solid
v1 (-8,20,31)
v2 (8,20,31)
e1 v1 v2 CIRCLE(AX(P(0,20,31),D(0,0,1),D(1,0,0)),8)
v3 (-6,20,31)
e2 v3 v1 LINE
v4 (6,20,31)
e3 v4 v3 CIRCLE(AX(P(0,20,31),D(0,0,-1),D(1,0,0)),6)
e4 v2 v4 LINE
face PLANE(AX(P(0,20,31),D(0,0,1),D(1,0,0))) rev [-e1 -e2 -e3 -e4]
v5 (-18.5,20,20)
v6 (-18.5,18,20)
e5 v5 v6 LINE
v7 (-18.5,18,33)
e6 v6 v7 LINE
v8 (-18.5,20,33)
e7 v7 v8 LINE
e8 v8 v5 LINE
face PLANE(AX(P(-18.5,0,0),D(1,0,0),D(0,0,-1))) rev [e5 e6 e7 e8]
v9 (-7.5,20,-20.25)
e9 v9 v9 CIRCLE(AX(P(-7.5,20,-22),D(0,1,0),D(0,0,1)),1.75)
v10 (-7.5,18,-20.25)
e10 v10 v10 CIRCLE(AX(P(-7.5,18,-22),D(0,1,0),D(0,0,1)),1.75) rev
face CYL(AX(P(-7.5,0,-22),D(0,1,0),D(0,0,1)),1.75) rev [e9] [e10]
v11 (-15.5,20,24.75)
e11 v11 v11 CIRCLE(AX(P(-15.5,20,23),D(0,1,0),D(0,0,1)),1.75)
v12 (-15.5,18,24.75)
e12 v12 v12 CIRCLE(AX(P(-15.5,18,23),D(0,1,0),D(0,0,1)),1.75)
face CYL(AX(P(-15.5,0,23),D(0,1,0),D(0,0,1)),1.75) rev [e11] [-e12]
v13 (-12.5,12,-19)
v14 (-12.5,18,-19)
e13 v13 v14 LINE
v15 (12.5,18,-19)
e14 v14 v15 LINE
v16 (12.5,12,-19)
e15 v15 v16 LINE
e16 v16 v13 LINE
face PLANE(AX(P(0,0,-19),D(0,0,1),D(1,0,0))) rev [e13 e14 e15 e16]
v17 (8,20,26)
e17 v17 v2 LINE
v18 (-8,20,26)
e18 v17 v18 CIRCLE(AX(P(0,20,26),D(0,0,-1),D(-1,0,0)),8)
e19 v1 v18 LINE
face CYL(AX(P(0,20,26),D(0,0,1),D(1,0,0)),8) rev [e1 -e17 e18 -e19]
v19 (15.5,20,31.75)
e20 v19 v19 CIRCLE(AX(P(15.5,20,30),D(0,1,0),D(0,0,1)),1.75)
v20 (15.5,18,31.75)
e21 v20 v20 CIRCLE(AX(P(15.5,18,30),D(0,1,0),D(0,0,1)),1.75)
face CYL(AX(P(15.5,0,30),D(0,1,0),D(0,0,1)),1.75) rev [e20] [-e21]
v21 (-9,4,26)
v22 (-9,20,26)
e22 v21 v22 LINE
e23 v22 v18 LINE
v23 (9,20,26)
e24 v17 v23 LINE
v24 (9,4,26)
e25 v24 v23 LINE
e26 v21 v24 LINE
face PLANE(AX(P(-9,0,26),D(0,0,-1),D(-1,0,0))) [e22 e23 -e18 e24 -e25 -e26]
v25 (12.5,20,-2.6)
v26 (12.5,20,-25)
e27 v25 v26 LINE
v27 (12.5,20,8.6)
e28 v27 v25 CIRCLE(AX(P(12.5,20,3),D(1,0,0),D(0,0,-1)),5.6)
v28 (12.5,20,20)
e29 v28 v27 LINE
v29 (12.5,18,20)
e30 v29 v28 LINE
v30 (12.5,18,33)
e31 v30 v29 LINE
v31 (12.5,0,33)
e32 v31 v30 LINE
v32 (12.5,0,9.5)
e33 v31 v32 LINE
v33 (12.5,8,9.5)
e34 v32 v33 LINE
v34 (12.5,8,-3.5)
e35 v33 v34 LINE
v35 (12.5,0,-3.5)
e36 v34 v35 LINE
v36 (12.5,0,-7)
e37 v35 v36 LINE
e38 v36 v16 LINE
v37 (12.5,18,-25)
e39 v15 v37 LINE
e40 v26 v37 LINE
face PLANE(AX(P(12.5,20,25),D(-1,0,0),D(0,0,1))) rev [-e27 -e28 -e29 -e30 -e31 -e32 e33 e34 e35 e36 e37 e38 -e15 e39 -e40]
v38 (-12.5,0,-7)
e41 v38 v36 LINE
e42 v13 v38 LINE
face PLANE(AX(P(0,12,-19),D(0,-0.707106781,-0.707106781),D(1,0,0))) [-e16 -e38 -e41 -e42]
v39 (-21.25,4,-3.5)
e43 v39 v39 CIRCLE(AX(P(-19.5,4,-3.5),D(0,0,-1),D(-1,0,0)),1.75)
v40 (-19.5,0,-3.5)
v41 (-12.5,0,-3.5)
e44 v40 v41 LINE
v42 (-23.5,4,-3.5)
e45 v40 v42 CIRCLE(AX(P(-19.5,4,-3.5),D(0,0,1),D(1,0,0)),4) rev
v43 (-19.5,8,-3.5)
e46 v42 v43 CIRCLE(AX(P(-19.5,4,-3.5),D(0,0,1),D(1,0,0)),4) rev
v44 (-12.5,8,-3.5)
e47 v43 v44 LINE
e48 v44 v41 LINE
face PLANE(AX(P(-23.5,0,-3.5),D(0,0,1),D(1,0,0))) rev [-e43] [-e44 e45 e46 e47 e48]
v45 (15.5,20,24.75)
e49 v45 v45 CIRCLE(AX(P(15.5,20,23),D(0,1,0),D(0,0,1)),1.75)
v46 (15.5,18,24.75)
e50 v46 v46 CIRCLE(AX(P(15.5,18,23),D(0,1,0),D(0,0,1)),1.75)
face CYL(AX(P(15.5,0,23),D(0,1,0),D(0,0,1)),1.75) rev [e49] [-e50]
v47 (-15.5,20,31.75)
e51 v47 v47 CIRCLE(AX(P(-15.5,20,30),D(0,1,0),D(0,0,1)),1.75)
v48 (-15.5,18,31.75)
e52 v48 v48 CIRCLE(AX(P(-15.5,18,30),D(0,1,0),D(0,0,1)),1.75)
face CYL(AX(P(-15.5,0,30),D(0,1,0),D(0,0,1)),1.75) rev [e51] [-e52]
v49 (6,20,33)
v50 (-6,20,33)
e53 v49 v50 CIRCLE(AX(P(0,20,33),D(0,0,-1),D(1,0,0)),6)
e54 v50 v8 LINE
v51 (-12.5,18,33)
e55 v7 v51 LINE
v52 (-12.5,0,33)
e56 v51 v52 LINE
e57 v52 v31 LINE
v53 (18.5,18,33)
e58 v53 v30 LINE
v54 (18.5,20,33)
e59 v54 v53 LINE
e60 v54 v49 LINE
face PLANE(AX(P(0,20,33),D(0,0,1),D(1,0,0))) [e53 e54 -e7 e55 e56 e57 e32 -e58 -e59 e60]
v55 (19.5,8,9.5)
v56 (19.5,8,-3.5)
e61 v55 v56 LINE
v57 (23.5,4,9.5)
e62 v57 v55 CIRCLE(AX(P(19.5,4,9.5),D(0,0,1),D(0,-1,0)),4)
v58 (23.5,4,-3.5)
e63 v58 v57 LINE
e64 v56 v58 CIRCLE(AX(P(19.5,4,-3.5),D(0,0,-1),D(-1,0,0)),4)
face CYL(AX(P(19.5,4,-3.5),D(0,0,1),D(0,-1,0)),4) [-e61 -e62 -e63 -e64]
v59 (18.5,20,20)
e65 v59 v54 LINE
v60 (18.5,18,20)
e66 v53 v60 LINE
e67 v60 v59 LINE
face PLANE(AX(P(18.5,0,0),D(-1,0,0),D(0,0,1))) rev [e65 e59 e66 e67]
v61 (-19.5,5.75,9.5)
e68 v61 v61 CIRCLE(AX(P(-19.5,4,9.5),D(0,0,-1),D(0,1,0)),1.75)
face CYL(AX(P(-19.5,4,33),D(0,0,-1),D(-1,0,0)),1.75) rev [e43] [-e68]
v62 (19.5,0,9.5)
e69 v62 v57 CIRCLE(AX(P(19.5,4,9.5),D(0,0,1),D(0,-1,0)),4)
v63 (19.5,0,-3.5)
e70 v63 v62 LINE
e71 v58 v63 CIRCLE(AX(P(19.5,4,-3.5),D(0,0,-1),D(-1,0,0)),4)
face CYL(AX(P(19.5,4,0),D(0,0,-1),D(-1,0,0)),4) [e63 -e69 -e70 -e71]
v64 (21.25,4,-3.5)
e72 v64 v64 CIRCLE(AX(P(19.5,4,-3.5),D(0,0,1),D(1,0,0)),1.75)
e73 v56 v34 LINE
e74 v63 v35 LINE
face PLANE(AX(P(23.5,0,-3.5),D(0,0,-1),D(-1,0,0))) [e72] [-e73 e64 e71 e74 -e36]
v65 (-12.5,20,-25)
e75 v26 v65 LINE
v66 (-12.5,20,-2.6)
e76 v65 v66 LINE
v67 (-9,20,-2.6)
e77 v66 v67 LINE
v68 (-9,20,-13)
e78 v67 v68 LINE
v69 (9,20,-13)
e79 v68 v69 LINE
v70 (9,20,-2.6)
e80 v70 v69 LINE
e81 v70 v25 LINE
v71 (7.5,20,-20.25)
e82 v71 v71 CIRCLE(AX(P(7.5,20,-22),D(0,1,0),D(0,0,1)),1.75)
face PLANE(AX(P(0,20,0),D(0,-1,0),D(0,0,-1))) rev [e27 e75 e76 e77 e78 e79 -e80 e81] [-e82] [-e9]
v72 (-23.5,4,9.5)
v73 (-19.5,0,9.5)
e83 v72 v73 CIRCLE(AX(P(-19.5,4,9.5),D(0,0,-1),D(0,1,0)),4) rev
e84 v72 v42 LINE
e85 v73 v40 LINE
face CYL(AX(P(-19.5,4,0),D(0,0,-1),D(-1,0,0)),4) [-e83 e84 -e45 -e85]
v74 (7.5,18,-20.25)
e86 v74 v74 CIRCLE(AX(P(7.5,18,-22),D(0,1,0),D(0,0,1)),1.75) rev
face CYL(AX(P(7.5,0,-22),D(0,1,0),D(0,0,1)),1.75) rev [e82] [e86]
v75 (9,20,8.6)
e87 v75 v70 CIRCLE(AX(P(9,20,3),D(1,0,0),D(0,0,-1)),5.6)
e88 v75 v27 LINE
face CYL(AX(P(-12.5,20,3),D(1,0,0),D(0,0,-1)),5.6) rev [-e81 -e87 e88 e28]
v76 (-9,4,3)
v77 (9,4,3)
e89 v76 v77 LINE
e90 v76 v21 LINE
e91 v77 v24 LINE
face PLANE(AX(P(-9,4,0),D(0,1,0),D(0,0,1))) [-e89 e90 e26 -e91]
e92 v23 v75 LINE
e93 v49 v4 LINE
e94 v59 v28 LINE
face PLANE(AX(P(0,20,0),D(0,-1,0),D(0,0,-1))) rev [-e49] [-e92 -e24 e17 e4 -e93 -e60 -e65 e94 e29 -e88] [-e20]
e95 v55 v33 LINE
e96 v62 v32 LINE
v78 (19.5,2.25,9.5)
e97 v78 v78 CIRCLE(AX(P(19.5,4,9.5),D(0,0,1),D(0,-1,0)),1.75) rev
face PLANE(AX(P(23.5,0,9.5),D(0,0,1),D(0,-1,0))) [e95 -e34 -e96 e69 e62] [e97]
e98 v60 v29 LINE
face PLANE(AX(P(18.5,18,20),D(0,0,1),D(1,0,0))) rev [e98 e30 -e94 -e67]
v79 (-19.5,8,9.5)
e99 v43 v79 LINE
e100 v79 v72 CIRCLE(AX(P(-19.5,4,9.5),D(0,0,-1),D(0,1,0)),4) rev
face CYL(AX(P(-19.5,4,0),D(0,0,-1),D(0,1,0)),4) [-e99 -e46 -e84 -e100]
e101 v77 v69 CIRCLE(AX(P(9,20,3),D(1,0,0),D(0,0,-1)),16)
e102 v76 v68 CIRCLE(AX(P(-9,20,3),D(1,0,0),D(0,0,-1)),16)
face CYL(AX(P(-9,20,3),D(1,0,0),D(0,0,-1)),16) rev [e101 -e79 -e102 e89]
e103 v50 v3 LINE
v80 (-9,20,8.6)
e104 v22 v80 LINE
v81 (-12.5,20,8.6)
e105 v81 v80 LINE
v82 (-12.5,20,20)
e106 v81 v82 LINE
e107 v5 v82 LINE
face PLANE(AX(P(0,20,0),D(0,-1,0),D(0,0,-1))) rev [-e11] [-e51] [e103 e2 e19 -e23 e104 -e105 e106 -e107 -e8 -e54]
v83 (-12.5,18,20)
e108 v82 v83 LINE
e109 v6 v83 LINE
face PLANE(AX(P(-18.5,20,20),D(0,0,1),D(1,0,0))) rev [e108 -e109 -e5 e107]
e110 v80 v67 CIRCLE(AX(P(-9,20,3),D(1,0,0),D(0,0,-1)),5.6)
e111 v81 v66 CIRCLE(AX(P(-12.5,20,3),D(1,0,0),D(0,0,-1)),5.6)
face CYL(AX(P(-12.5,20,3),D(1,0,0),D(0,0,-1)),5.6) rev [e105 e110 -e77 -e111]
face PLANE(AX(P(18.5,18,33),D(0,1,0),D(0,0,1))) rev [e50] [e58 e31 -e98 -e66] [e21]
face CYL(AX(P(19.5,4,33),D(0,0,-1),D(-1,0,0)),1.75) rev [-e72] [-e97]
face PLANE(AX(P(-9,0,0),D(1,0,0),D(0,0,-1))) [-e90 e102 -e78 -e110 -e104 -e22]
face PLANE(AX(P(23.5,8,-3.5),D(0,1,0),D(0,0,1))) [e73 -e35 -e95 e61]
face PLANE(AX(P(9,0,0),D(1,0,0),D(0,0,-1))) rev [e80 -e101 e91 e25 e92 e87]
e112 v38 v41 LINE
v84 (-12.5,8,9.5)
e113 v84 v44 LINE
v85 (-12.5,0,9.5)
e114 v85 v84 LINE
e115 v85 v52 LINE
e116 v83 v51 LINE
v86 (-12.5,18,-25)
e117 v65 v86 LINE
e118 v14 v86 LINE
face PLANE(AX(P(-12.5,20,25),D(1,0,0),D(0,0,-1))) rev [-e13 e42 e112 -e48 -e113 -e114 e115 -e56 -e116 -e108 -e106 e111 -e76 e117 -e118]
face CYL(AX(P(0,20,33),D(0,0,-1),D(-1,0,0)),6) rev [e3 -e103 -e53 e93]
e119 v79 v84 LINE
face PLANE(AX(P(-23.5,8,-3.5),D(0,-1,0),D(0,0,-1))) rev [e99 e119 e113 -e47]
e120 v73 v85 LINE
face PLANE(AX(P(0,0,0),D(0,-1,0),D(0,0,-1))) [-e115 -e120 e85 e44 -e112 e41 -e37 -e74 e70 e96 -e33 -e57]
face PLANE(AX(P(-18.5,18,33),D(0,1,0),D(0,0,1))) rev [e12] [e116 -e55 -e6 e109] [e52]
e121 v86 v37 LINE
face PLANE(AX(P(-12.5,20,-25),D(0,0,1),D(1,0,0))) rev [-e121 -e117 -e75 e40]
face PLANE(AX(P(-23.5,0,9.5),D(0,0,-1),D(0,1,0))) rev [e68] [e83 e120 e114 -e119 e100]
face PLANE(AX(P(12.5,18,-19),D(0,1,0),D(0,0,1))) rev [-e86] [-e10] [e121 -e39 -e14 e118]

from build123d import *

# Parameters (mm, degrees)
CROQUIS2_W                 = 25
CROQUIS2_H                 = 50
SALIENTE_EXTRUIR2_DEPTH    = 20
CROQUIS19_W                = 25
CROQUIS19_H                = 20
SALIENTE_EXTRUIR8_DEPTH    = 6
CORTAR_EXTRUIR1_DEPTH      = 9
CORTAR_EXTRUIR2_DEPTH      = 39.951893407
CORTAR_EXTRUIR2_DEPTH_BACK = 39.951893407
CROQUIS9_R                 = 8
CORTAR_EXTRUIR3_DEPTH      = 5
SALIENTE_EXTRUIR9_DEPTH    = 2
CROQUIS11_W                = 13
CROQUIS11_H                = 2
SALIENTE_EXTRUIR4_DEPTH    = 6
CROQUIS13_W                = 13
CROQUIS13_H                = 2
SALIENTE_EXTRUIR5_DEPTH    = 6
CROQUIS16_R                = 1.75
CORTAR_EXTRUIR6_DEPTH      = 43.793106922
CROQUIS17_W                = 13
CROQUIS17_H                = 8
SALIENTE_EXTRUIR7_DEPTH    = 11
REDONDEO1_R                = 4
CROQUIS12_R                = 1.75
CORTAR_EXTRUIR4_DEPTH      = 46.180194776
CROQUIS14_R                = 1.75
CORTAR_EXTRUIR5_DEPTH      = 46.180194776
CROQUIS18_R                = 1.75
CORTAR_EXTRUIR7_DEPTH      = 48.796443382
REDONDEO1_OF_SIMETR_A1_R   = 4
CROQUIS23_W                = 25
CROQUIS23_H                = 18
CORTAR_EXTRUIR9_DEPTH      = 6
CHAFL_N1_SIZE              = 12


with BuildPart() as part:
    # Croquis2 → Saliente-Extruir2 (new body)
    with BuildSketch(Plane(origin=(0, 0, 0), x_dir=(1, 0, 0), z_dir=(0, 1, 0))):
        Rectangle(CROQUIS2_W, CROQUIS2_H)
    extrude(amount=SALIENTE_EXTRUIR2_DEPTH)

    # Croquis19 → Saliente-Extruir8 (add)
    with BuildSketch(Plane.XY.offset(25)):
        with Locations((0, 10)):
            Rectangle(CROQUIS19_W, CROQUIS19_H)
    extrude(amount=SALIENTE_EXTRUIR8_DEPTH)

    # Croquis4 → Cortar-Extruir1 (cut, symmetric)
    with BuildSketch(Plane(origin=(0, 0, 0), x_dir=(0, 0, -1), z_dir=(1, 0, 0))):
        with BuildLine():
            Line((-26, 4), (-3, 4))
            ThreePointArc((-3, 4), (8.313708499, 8.686291501), (13, 20))
            Line((13, 20), (-26, 20))
            Line((-26, 20), (-26, 4))
        make_face()
    extrude(amount=CORTAR_EXTRUIR1_DEPTH, both=True, mode=Mode.SUBTRACT)

    # Croquis5 → Cortar-Extruir2 (cut, two sides: drawn at the far end of the back side and taken through both)
    with BuildSketch(Plane(origin=(0, 0, 0), x_dir=(0, 0, -1), z_dir=(1, 0, 0)).offset(-CORTAR_EXTRUIR2_DEPTH_BACK)):
        with BuildLine():
            ThreePointArc((2.6, 20), (-3, 25.6), (-8.6, 20))
            Line((-8.6, 20), (2.6, 20))
        make_face()
        with BuildLine():
            Line((2.6, 20), (-8.6, 20))
            ThreePointArc((-8.6, 20), (-3, 14.4), (2.6, 20))
        make_face()
    extrude(amount=CORTAR_EXTRUIR2_DEPTH + CORTAR_EXTRUIR2_DEPTH_BACK, mode=Mode.SUBTRACT)

    # Croquis9 → Cortar-Extruir3 (cut)
    with BuildSketch(Plane.XY.offset(31)):
        with Locations((0, 20)):
            Circle(CROQUIS9_R)
    extrude(amount=-CORTAR_EXTRUIR3_DEPTH, mode=Mode.SUBTRACT)

    # Croquis22 → Saliente-Extruir9 (add)
    with BuildSketch(Plane.XY.offset(31)):
        with BuildLine():
            Line((6, 20), (12.5, 20))
            Line((12.5, 20), (12.5, 0))
            Line((12.5, 0), (-12.5, 0))
            Line((-12.5, 0), (-12.5, 20))
            Line((-12.5, 20), (-6, 20))
            ThreePointArc((-6, 20), (0, 14), (6, 20))
        make_face()
    extrude(amount=SALIENTE_EXTRUIR9_DEPTH)

    # Croquis11 → Saliente-Extruir4 (add)
    with BuildSketch(Plane(origin=(12.5, 0, 0), x_dir=(0, 0, -1), z_dir=(1, 0, 0))):
        with Locations((-26.5, 19)):
            Rectangle(CROQUIS11_W, CROQUIS11_H)
    extrude(amount=SALIENTE_EXTRUIR4_DEPTH)

    # Croquis13 → Saliente-Extruir5 (add)
    with BuildSketch(Plane.ZY.offset(12.5)):
        with Locations((26.5, 19)):
            Rectangle(CROQUIS13_W, CROQUIS13_H)
    extrude(amount=SALIENTE_EXTRUIR5_DEPTH)

    # Croquis16 → Cortar-Extruir6 (cut, through all)
    with BuildSketch(Plane(origin=(0, 20, 0), x_dir=(1, 0, 0), z_dir=(0, 1, 0))):
        with Locations(Location((-7.5, 22, 0), (0, 0, 270))):
            Circle(CROQUIS16_R)
        with Locations(Location((7.5, 22, 0), (0, 0, 270))):
            Circle(CROQUIS16_R)
    extrude(amount=-CORTAR_EXTRUIR6_DEPTH, mode=Mode.SUBTRACT)

    # Croquis17 → Saliente-Extruir7 (add)
    with BuildSketch(Plane.ZY.offset(12.5)):
        with Locations((3, 4)):
            Rectangle(CROQUIS17_W, CROQUIS17_H)
    saliente_extruir7 = extrude(amount=SALIENTE_EXTRUIR7_DEPTH)

    # Redondeo1
    redondeo1_edges = [part.edges().sort_by_distance(p)[0] for p in [
        (-23.5, 0, 3),
        (-23.5, 8, 3),
    ]]
    fillet(redondeo1_edges, radius=REDONDEO1_R - 0.0001)  # a hair under: the kernel refuses the full size

    # Croquis12 → Cortar-Extruir4 (cut, through all)
    with BuildSketch(Plane(origin=(0, 20, 0), x_dir=(1, 0, 0), z_dir=(0, 1, 0))):
        with Locations(Location((15.5, -23, 0), (0, 0, 270))):
            Circle(CROQUIS12_R)
        with Locations(Location((15.5, -30, 0), (0, 0, 270))):
            Circle(CROQUIS12_R)
    extrude(amount=-CORTAR_EXTRUIR4_DEPTH, mode=Mode.SUBTRACT)

    # Croquis14 → Cortar-Extruir5 (cut, through all)
    with BuildSketch(Plane(origin=(0, 20, 0), x_dir=(1, 0, 0), z_dir=(0, 1, 0))):
        with Locations(Location((-15.5, -23, 0), (0, 0, 270))):
            Circle(CROQUIS14_R)
        with Locations(Location((-15.5, -30, 0), (0, 0, 270))):
            Circle(CROQUIS14_R)
    extrude(amount=-CORTAR_EXTRUIR5_DEPTH, mode=Mode.SUBTRACT)

    # Croquis18 → Cortar-Extruir7 (cut, through all)
    with BuildSketch(Plane(origin=(0, 0, -3.5), x_dir=(-1, 0, 0), z_dir=(0, 0, -1))):
        with Locations((19.5, 4)):
            Circle(CROQUIS18_R)
    cortar_extruir7 = extrude(amount=-CORTAR_EXTRUIR7_DEPTH, mode=Mode.SUBTRACT)

    # Simetría1: Saliente-Extruir7, Cortar-Extruir7 across plane
    add(saliente_extruir7.mirror(Plane(origin=(0, 0, 0), x_dir=(0, 0, 1), z_dir=(1, 0, 0))))
    add(cortar_extruir7.mirror(Plane(origin=(0, 0, 0), x_dir=(0, 0, 1), z_dir=(1, 0, 0))), mode=Mode.SUBTRACT)

    # Redondeo1 of Simetría1
    redondeo1_of_simetr_a1_edges = [part.edges().sort_by_distance(p)[0] for p in [
        (23.5, 0, 3),
        (23.5, 8, 3),
    ]]
    fillet(redondeo1_of_simetr_a1_edges, radius=REDONDEO1_OF_SIMETR_A1_R - 0.0001)  # a hair under: the kernel refuses the full size

    # Croquis23 → Cortar-Extruir9 (cut)
    with BuildSketch(Plane(origin=(0, 0, -25), x_dir=(-1, 0, 0), z_dir=(0, 0, -1))):
        with Locations((0, 9)):
            Rectangle(CROQUIS23_W, CROQUIS23_H)
    extrude(amount=-CORTAR_EXTRUIR9_DEPTH, mode=Mode.SUBTRACT)

    # Chaflán1
    chafl_n1_edges = [part.edges().sort_by_distance(p)[0] for p in [
        (0, 0, -19),
    ]]
    chamfer(chafl_n1_edges, length=CHAFL_N1_SIZE)


solid = part.part
